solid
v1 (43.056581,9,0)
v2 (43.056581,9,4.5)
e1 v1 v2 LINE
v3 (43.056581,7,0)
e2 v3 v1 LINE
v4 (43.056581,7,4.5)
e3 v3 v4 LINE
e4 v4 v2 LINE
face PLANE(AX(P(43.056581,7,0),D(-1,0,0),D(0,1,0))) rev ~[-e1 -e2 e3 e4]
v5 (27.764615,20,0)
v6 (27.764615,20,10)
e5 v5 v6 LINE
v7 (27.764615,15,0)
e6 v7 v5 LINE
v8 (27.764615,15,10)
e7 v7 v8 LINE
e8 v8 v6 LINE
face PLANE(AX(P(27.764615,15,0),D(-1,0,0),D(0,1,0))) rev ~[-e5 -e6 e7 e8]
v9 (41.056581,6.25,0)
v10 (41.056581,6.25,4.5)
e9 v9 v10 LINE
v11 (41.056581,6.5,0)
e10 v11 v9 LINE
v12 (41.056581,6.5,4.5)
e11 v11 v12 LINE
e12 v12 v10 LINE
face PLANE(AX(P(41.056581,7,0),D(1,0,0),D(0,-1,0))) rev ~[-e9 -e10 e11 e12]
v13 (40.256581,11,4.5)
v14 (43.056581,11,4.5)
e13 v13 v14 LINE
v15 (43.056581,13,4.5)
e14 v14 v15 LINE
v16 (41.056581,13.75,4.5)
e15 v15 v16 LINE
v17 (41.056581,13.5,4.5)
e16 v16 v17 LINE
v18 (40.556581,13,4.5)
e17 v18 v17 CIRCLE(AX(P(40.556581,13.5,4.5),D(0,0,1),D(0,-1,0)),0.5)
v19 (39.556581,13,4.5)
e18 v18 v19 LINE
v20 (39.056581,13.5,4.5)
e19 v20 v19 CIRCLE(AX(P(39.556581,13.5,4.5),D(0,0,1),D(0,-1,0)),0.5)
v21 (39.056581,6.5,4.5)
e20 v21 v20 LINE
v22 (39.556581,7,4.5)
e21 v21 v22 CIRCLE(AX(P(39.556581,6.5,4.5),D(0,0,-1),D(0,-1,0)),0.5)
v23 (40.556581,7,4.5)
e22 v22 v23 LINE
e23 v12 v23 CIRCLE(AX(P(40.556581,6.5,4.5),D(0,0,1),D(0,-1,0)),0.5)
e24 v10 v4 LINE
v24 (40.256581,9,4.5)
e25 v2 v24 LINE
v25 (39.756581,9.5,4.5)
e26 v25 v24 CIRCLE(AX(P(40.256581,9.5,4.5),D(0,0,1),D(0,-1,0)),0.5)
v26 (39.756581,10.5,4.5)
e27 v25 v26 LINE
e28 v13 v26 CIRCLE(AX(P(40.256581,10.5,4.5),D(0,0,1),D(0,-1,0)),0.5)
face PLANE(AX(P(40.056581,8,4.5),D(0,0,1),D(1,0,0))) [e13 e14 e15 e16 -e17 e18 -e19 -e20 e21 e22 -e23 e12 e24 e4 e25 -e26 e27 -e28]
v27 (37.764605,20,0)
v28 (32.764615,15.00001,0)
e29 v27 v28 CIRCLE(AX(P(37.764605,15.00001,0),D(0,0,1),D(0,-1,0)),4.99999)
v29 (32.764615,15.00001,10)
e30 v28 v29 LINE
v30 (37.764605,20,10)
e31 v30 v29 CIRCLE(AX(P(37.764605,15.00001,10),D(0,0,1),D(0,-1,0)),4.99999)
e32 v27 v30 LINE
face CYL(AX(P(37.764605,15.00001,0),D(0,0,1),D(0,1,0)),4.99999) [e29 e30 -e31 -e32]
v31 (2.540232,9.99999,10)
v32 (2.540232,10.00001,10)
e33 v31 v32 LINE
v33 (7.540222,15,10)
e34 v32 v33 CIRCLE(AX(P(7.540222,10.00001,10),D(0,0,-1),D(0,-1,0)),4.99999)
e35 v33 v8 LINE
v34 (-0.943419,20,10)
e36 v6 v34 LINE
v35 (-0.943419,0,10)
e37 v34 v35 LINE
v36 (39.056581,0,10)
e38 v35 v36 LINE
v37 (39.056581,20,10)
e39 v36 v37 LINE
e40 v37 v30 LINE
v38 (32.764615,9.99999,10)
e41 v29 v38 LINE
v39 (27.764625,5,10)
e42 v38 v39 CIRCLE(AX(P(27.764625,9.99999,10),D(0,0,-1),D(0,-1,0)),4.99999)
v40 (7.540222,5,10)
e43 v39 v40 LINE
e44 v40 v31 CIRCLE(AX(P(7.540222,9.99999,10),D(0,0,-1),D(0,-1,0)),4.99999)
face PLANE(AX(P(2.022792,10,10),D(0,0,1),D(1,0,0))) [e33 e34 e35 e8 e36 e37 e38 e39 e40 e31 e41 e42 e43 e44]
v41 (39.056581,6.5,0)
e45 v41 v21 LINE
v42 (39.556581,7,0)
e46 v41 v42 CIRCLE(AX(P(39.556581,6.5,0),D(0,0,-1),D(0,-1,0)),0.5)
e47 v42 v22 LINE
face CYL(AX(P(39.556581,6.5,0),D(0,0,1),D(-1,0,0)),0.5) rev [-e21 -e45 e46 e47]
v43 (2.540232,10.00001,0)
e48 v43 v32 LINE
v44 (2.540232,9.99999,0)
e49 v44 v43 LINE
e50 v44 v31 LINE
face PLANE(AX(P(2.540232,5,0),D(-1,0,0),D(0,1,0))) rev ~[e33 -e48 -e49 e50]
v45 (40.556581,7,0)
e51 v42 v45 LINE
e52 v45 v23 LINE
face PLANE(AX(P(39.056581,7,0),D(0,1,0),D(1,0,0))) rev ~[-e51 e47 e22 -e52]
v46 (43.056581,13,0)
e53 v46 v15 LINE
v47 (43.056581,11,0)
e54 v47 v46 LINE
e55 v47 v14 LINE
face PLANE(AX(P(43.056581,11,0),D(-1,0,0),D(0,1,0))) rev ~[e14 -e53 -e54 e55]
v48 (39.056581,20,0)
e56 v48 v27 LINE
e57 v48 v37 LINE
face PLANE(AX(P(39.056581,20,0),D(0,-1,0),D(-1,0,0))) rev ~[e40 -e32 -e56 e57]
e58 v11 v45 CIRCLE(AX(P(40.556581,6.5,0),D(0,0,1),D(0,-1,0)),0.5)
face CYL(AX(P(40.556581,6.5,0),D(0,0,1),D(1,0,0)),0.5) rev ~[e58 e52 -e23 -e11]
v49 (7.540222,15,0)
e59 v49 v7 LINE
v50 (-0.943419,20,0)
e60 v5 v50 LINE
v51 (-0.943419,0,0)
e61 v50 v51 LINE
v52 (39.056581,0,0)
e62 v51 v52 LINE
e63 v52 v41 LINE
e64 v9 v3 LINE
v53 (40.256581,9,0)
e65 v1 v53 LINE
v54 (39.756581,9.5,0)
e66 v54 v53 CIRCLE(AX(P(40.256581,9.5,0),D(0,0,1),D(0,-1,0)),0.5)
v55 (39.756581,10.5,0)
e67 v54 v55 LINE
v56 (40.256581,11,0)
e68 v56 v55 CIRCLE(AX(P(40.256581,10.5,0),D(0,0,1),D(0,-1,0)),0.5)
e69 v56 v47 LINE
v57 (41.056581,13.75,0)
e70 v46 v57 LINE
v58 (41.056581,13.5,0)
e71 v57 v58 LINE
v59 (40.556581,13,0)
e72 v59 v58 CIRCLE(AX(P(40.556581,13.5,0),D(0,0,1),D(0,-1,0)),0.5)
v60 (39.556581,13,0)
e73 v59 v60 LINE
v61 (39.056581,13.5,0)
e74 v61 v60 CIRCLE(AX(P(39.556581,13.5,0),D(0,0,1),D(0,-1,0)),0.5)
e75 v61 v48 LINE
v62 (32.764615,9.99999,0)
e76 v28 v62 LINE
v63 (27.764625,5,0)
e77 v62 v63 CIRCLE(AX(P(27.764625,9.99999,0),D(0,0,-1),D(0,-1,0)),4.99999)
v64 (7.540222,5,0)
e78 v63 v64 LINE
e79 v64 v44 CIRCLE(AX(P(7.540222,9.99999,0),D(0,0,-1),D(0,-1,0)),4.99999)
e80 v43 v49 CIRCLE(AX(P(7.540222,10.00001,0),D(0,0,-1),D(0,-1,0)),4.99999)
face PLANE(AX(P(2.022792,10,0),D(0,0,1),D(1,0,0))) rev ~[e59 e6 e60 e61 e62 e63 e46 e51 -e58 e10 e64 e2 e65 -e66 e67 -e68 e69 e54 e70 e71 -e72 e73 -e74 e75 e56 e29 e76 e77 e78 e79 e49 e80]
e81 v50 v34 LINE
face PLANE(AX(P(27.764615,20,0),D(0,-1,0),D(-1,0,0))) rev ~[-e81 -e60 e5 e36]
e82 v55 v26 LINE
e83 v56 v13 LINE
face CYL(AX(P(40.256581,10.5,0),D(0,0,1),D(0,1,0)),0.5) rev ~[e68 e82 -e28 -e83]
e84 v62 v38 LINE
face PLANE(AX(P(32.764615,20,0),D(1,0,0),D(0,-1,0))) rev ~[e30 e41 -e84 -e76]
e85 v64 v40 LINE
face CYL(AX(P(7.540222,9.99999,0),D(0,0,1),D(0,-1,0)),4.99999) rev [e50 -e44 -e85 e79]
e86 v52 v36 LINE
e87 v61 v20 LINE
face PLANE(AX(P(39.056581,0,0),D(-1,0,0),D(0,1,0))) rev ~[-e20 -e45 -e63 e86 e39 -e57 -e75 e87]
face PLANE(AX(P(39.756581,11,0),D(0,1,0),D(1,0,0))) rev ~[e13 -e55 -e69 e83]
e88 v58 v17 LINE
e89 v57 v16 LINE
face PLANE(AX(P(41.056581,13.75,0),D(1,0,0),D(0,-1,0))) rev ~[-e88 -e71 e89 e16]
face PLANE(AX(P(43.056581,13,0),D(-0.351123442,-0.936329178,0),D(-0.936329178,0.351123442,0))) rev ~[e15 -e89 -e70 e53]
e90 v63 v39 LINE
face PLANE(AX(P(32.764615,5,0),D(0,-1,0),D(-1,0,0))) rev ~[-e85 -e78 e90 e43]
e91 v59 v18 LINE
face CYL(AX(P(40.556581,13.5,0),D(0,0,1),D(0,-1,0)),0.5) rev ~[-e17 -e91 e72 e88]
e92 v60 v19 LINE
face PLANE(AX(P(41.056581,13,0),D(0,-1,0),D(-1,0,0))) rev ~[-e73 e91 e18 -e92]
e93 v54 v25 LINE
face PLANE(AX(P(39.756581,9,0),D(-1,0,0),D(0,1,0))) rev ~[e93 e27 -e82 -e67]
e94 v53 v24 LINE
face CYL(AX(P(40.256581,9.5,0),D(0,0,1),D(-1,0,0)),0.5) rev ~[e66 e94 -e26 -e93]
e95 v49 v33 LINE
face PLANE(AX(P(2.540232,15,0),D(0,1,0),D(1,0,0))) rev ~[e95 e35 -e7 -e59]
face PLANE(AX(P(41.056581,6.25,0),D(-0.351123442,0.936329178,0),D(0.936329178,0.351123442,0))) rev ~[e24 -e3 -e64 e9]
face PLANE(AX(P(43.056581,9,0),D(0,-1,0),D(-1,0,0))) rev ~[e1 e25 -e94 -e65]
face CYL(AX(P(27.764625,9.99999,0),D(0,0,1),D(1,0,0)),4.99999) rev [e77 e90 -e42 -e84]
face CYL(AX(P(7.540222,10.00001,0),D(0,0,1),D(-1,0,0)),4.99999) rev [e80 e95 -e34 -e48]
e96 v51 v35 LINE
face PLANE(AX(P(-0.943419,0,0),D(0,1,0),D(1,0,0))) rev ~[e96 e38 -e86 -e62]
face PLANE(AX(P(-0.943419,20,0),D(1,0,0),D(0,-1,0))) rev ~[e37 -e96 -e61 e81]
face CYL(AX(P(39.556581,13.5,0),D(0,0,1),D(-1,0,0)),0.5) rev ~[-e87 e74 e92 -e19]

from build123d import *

# Parameters (mm, degrees)
F0_W     = 22.0889396991
F0_H     = 5
F1_DEPTH = 10
F0_W_2   = 2
F0_H_2   = 2
F0_W_3   = 0.7
F2_DEPTH = 4.5
F3_R     = 4.99999
F4_R     = 0.5


# Not quite as in the source:
# - a fillet or chamfer is up to 0.001 mm smaller than in the source, because OpenCascade refuses the exact size


with BuildPart() as f1:
    # F0 (on Top) → F1 (new body)
    with BuildSketch(Plane.XY):
        Polygon((-0.9434188306, 20), (-0.9434188306, 0), (5.6756753474, 0), (5.6756753474, 5), (2.5402316824, 5), (2.5402316824, 15), (5.6756753474, 15), (5.6756753474, 20), align=None)
        Polygon((5.6756753474, 5), (5.6756753474, 0), (39.0565811694, 0), (39.0565811694, 7), (39.0565811694, 9), (39.0565811694, 11), (39.0565811694, 13), (39.0565811694, 20), (32.7646150465, 20), (32.7646150465, 15), (32.7646150465, 5), align=None)
        with Locations((16.720145197, 17.5)):
            Rectangle(F0_W, F0_H)
    extrude(amount=F1_DEPTH)

    # F0 (on Top) → F2 (join)
    with BuildSketch(Plane.XY):
        Polygon((39.0565811694, 9), (39.0565811694, 7), (41.0565811694, 7), (41.0565811694, 9), (39.7565811694, 9), align=None)
        with Locations((42.0565811694, 8)):
            Rectangle(F0_W_2, F0_H_2)
        Polygon((43.0565811694, 7), (41.0565811694, 7), (41.0565811694, 6.25), align=None)
        Polygon((39.0565811694, 13), (39.0565811694, 11), (39.7565811694, 11), (41.0565811694, 11), (41.0565811694, 13), align=None)
        with Locations((42.0565811694, 12)):
            Rectangle(F0_W_2, F0_H_2)
        Polygon((41.0565811694, 13.75), (41.0565811694, 13), (43.0565811694, 13), align=None)
        with Locations((39.4065811694, 10)):
            Rectangle(F0_W_3, F0_H_2)
    extrude(amount=F2_DEPTH)

    # F3 (radius 5 in the source; OpenCascade refuses exactly that, so slightly less here)
    f3_edges = [f1.edges().sort_by_distance(p)[0] for p in [
        (2.540232, 15, 5),
        (2.540232, 5, 5),
        (32.764615, 5, 5),
        (32.764615, 20, 5),
    ]]
    fillet(f3_edges, radius=F3_R)

    # F4
    f4_edges = [f1.edges().sort_by_distance(p)[0] for p in [
        (39.056581, 13, 2.25),
        (39.056581, 7, 2.25),
        (41.056581, 7, 2.25),
        (41.056581, 13, 2.25),
        (39.756581, 11, 2.25),
        (39.756581, 9, 2.25),
    ]]
    fillet(f4_edges, radius=F4_R)


solid = f1.part
